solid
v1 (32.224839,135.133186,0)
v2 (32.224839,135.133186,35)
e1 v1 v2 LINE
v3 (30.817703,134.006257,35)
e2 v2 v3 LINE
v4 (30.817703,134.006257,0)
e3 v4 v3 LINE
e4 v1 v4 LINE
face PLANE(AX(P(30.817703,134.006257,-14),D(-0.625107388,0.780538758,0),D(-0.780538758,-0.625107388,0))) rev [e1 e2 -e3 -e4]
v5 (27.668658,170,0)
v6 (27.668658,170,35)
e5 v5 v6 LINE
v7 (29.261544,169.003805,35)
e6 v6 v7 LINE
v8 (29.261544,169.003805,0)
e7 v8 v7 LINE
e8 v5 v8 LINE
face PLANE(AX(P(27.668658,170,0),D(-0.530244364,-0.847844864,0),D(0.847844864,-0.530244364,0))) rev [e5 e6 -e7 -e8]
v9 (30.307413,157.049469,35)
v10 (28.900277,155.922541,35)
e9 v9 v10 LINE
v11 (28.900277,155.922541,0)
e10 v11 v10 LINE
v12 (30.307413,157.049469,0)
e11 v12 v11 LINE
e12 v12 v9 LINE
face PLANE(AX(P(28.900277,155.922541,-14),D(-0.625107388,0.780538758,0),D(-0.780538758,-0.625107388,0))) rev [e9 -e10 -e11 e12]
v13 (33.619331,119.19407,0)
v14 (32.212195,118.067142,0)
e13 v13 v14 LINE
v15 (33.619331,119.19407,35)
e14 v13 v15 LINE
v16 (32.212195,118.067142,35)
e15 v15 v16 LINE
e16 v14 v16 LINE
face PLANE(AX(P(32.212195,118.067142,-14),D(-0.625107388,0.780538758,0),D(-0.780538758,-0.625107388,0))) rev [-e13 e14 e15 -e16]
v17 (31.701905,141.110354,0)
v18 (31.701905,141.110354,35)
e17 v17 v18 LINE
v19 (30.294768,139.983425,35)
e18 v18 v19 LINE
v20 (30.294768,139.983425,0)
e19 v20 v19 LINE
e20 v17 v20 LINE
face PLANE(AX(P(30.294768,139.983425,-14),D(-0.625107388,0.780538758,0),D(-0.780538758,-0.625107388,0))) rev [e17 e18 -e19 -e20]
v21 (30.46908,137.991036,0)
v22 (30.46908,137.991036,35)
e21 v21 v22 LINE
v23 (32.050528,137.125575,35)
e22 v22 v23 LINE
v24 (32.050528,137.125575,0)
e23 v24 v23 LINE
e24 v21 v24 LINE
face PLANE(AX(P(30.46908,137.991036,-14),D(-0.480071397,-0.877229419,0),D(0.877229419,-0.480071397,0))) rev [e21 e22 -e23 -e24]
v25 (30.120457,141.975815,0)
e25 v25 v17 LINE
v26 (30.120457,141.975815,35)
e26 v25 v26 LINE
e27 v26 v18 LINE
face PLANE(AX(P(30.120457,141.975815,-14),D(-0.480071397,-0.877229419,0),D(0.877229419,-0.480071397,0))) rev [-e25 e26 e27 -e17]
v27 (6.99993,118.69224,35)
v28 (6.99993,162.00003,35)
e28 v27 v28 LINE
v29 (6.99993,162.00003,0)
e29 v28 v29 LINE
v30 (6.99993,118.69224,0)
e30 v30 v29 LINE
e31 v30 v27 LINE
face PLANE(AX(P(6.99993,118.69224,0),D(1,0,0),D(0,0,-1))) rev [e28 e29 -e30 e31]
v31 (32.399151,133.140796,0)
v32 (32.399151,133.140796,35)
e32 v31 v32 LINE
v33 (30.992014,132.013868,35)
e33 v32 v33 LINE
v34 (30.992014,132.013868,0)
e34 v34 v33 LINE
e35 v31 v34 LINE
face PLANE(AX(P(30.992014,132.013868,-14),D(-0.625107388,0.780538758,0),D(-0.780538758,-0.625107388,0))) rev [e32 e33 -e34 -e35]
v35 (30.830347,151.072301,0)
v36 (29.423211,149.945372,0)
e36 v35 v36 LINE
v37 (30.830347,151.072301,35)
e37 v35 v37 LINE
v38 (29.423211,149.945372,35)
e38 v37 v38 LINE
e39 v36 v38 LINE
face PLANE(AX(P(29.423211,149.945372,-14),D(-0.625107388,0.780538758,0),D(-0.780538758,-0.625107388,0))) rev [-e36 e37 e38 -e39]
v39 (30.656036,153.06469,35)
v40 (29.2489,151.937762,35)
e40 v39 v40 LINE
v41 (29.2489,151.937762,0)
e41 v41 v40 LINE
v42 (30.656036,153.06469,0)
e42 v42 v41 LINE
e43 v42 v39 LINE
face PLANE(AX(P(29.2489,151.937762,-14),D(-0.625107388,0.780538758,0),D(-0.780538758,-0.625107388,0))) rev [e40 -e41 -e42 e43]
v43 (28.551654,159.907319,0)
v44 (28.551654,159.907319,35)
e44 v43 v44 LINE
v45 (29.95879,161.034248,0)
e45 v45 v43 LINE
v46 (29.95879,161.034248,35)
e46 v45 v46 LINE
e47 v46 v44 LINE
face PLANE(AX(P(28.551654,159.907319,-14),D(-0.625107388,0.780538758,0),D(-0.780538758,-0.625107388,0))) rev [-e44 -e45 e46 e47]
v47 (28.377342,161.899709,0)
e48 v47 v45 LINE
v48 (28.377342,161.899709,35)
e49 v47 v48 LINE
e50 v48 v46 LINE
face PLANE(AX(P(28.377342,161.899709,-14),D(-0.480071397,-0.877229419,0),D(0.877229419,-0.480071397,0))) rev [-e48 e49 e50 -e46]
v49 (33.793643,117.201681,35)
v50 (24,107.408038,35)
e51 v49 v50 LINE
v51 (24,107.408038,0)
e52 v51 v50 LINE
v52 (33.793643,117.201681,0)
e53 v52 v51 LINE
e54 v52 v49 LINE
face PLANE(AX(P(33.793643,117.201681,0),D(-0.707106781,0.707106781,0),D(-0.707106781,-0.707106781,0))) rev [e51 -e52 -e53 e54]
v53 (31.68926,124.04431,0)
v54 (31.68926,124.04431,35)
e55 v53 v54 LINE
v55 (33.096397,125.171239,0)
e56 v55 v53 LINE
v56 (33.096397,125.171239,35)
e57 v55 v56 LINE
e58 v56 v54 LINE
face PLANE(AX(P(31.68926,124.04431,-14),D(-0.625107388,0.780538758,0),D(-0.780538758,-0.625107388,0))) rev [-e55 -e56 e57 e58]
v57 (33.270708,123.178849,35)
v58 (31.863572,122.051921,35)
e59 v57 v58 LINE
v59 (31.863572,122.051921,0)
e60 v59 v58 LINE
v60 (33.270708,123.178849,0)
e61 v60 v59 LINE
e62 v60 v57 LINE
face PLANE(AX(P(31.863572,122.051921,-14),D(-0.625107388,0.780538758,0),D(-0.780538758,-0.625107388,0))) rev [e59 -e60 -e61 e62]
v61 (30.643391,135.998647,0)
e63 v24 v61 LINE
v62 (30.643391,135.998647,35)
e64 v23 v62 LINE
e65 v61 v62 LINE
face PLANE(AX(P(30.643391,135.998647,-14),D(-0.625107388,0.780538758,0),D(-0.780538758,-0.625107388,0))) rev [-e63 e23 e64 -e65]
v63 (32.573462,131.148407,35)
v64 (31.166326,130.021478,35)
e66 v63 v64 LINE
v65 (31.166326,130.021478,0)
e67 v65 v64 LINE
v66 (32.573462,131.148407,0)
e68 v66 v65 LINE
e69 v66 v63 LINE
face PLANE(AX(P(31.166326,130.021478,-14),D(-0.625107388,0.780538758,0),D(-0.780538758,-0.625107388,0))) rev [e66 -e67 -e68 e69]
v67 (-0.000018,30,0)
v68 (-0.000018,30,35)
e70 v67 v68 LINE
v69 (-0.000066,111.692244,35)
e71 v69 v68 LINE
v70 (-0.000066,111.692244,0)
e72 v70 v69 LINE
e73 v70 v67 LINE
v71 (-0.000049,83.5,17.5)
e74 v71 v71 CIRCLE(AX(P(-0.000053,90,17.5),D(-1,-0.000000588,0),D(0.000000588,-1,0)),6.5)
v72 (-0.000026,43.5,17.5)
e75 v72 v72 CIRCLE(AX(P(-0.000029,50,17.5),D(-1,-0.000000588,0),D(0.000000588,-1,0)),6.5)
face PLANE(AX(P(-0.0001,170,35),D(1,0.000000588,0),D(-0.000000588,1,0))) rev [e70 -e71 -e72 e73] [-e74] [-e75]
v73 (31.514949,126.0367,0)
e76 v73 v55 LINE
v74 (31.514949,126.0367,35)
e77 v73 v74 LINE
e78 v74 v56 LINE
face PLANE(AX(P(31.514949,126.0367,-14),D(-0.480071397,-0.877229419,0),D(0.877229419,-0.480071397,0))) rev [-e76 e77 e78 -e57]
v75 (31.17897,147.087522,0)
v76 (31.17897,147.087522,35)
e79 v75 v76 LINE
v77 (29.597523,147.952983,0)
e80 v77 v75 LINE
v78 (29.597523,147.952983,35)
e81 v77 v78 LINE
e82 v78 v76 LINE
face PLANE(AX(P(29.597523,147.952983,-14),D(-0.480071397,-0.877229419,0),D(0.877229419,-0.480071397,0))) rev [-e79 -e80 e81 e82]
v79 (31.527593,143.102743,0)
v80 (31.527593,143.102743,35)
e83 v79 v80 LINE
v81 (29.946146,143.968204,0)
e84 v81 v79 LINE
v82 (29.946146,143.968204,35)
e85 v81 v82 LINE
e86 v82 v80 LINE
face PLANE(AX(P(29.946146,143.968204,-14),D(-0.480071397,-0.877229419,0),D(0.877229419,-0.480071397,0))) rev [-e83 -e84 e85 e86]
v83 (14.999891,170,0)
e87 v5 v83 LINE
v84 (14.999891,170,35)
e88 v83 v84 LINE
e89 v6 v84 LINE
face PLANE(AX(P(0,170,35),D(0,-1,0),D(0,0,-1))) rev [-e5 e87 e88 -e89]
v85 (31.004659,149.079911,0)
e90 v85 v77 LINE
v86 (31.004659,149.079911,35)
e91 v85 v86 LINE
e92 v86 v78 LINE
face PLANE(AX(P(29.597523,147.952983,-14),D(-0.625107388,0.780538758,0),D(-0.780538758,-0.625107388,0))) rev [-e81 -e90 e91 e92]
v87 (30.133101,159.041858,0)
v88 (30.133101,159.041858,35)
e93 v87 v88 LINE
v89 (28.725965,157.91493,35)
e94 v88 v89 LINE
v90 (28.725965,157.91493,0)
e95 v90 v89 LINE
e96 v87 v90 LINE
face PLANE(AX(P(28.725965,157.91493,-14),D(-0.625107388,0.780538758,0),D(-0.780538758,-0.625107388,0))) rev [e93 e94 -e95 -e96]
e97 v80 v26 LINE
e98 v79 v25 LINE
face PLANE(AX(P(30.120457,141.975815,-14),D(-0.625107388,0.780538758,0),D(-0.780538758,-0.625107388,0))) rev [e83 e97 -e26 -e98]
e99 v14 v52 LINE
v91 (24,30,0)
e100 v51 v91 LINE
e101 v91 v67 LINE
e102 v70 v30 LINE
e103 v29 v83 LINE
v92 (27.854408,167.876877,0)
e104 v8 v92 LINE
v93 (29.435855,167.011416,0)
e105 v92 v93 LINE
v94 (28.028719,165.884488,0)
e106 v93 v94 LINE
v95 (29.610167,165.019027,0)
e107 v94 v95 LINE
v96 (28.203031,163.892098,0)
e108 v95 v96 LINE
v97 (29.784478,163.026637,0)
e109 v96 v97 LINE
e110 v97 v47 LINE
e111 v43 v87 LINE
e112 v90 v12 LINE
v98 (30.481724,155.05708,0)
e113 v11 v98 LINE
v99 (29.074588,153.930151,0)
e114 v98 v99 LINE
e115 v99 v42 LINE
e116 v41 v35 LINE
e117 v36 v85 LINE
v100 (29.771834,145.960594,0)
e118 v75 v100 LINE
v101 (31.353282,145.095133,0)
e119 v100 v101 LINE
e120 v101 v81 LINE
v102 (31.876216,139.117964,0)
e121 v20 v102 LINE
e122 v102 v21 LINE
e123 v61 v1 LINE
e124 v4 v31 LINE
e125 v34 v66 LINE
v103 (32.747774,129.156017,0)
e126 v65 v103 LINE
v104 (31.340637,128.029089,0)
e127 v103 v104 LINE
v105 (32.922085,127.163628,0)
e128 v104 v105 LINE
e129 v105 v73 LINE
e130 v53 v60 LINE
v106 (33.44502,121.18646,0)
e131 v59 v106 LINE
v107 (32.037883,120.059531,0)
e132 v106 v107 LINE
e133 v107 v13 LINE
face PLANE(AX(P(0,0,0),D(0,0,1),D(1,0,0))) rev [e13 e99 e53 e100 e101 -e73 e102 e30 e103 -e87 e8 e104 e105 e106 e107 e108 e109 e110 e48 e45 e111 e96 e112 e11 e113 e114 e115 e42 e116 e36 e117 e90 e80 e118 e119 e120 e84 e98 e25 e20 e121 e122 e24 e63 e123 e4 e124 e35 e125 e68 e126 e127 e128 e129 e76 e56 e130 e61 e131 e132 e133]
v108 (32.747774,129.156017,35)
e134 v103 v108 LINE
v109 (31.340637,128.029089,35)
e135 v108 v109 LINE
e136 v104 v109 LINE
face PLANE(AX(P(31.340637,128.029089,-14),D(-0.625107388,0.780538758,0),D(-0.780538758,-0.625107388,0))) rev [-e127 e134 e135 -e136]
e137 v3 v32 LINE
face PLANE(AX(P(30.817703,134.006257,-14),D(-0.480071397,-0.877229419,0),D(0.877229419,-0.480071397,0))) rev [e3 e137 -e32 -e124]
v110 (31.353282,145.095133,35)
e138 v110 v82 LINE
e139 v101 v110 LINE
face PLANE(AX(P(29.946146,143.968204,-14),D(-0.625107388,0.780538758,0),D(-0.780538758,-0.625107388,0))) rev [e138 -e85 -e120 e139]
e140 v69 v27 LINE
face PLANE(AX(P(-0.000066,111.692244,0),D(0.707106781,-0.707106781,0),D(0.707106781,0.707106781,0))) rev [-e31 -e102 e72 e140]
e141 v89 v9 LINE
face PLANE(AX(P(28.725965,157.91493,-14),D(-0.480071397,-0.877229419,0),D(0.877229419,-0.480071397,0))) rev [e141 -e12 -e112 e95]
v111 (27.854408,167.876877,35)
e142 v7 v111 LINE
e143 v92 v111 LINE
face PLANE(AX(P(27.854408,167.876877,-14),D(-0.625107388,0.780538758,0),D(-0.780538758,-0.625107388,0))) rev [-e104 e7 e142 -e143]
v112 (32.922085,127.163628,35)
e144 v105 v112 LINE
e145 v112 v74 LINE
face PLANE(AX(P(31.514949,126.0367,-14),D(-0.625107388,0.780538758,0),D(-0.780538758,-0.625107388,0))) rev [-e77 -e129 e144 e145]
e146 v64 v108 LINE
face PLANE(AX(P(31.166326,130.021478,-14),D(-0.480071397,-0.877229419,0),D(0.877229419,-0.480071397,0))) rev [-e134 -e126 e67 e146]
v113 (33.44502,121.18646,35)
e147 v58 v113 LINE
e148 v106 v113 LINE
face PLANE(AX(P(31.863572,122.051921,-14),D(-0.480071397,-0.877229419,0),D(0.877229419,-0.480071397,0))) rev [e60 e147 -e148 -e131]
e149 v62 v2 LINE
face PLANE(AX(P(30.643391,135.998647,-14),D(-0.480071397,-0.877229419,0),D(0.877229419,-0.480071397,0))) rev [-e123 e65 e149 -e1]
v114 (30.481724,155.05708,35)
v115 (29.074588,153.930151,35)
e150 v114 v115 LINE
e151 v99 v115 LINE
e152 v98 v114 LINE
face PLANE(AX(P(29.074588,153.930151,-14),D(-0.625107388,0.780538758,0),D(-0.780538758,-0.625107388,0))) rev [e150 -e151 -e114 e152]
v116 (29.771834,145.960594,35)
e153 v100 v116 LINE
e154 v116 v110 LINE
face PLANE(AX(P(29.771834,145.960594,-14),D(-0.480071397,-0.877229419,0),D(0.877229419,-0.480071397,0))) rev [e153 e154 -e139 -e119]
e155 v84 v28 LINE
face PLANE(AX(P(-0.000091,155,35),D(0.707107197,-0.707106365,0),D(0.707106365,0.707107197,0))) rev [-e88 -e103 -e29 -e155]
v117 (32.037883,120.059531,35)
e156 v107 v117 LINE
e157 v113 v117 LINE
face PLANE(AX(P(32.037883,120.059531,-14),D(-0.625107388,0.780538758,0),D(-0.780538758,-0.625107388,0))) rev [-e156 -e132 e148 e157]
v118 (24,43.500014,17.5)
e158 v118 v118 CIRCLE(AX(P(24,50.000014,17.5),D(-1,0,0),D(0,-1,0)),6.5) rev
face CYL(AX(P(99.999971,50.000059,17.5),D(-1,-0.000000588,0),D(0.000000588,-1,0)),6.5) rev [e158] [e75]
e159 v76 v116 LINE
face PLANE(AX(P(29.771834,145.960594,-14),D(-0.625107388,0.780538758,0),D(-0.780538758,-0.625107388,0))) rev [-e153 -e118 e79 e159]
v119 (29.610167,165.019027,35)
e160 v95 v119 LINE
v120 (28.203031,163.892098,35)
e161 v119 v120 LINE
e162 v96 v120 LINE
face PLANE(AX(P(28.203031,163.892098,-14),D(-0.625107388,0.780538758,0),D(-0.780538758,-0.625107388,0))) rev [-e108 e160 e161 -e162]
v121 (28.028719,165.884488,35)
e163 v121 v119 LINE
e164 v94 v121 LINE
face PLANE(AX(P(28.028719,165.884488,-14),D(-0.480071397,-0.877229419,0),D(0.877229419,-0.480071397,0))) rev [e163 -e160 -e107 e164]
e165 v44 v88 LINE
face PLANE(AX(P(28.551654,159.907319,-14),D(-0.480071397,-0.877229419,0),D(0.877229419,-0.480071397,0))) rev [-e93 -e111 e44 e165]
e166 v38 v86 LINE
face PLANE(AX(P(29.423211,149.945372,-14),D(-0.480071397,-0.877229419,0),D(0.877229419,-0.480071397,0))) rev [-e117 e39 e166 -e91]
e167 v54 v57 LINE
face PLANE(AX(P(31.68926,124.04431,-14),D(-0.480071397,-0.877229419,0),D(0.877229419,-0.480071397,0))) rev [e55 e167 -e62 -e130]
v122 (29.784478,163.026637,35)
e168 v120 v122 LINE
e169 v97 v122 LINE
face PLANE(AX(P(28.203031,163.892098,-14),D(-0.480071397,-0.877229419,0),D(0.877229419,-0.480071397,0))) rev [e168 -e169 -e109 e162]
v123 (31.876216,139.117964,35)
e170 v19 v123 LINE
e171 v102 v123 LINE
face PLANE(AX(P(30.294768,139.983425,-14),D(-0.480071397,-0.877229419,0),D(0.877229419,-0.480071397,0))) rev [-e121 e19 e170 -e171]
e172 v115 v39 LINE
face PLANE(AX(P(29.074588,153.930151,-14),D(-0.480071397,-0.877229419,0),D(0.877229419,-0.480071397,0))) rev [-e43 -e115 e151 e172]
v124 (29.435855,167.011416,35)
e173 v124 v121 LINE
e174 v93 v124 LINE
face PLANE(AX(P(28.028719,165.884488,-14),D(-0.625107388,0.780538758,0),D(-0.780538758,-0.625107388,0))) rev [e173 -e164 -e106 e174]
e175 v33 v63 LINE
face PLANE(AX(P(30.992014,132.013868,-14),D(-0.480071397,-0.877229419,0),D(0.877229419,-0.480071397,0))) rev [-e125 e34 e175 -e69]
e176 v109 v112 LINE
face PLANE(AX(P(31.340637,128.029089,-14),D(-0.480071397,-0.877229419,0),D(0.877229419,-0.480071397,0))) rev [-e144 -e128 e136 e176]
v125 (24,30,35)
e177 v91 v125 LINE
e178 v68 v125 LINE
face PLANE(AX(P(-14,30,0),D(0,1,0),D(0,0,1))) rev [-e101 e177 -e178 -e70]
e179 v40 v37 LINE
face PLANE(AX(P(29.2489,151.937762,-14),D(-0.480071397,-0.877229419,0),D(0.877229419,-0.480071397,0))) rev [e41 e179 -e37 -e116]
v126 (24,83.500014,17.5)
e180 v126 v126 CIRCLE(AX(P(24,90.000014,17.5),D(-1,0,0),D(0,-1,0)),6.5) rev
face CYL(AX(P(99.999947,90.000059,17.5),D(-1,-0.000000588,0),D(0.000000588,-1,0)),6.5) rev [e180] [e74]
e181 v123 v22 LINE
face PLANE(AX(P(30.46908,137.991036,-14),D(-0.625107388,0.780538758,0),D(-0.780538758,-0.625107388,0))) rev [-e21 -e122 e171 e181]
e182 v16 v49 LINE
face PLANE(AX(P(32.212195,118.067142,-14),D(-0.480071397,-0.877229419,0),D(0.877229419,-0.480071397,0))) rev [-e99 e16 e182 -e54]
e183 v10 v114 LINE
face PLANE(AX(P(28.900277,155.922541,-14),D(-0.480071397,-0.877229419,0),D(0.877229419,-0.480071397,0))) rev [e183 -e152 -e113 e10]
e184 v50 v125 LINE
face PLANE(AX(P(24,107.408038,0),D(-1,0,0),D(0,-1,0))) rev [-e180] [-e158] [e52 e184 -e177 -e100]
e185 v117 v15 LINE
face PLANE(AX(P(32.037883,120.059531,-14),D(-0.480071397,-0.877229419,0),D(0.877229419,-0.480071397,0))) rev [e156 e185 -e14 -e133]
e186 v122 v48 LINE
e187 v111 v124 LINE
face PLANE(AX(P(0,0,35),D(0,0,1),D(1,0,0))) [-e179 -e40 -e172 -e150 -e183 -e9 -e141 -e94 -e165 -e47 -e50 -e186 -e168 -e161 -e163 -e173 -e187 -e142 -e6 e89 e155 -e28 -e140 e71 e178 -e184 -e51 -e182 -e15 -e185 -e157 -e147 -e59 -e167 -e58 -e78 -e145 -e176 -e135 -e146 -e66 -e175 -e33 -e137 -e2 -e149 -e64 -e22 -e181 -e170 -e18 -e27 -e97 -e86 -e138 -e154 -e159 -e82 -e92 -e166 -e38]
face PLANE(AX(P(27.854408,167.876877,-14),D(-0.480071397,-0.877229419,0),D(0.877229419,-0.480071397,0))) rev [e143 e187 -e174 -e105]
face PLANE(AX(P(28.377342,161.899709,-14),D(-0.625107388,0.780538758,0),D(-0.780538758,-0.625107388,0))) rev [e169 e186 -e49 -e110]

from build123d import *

# Parameters (mm, degrees)
EXTRUDE_1_DEPTH        = 35
CUT_EXTRUDE_28_DEPTH   = 49
CUT_EXTRUDE_29_DEPTH   = 178.259696491
CUT_EXTRUDE_30_DEPTH   = 49
PATTERN_LINEAR_1_COUNT = 26
PATTERN_LINEAR_1_PITCH = 2
CHAMFER_2_SIZE         = 3.4
SKETCH_54_W            = 35
SKETCH_54_H            = 30
CUT_EXTRUDE_33_DEPTH   = 50
CUT_EXTRUDE_34_DEPTH   = 110
CHAMFER_3_SIZE         = 15
SKETCH_61_R            = 6.5
CUT_EXTRUDE_37_DEPTH   = 100
CUT_EXTRUDE_38_DEPTH   = 177.82480109
CUT_EXTRUDE_39_DEPTH   = 177.82480109


with BuildPart() as part:
    # 草图48 → 拉伸1 (new body)
    with BuildSketch(Plane.XY):
        Polygon((34.1, 110), (36, 110), (36, 0), (0, 0), (-0.0001, 170), (34.1, 170), (34.1, 144.543002638), align=None)
    extrude(amount=EXTRUDE_1_DEPTH)

    # 草图49 → 切除-拉伸28 (cut)
    with BuildSketch(Plane.XY.offset(35)):
        Polygon((34.1, 113.69999995), (29.174388239, 170), (34.1, 170), align=None)
    extrude(amount=-CUT_EXTRUDE_28_DEPTH, mode=Mode.SUBTRACT)

    # 草图50 → 切除-拉伸29 (cut, through all)
    with BuildSketch(Plane.XY.offset(35)):
        Polygon((27.668658483, 170), (29.261543982, 169.003805302), (29.174388239, 170), align=None)
    extrude(amount=-CUT_EXTRUDE_29_DEPTH, mode=Mode.SUBTRACT)

    # 草图51 → 切除-拉伸30 (cut)
    with BuildSketch(Plane.XY.offset(35)):
        Polygon((27.854407685, 167.876876901), (29.261543982, 169.003805302), (29.435855467, 167.011415906), align=None)
    cut_extrude_30 = extrude(amount=-CUT_EXTRUDE_30_DEPTH, mode=Mode.SUBTRACT)

    # 阵列(线性)1: 切除-拉伸30 ×26
    with Locations(*[Vector(0.08715574274765898, -0.9961946980917455, 0) * (i * PATTERN_LINEAR_1_PITCH) for i in range(1, PATTERN_LINEAR_1_COUNT)]):
        add(cut_extrude_30, mode=Mode.SUBTRACT)

    # 倒角2
    # the kernel refuses this chamfer: 3.4 mm, written as the material it takes off along each edge
    with BuildSketch(Plane(origin=(36, 110, -8.743722159), x_dir=(-0.9996219169112966, 0.027495876610587885, 0), z_dir=(0, 0, 1))) as chamfer_2_piece_1_section:
        Polygon((CHAMFER_2_SIZE * 0.999621916911, CHAMFER_2_SIZE * 0.0274958766106), (-CHAMFER_2_SIZE * 0.0274958766106, CHAMFER_2_SIZE * 0.999621916911), (0, 0), align=None)
    chamfer_2_piece_1 = extrude(amount=52.487444318, mode=Mode.PRIVATE)
    chamfer_2_piece_1 = split(chamfer_2_piece_1, bisect_by=Plane(origin=(34.1, 108.700122697, 17.5), z_dir=(1, 0, 0)), keep=Keep.TOP, mode=Mode.PRIVATE)
    add(chamfer_2_piece_1, mode=Mode.SUBTRACT)

    # 草图54 → 切除-拉伸33 (cut)
    with BuildSketch(Plane(origin=(36, 0, 0), x_dir=(0, 0, -1), z_dir=(1, 0, 0))):
        with Locations((-17.5, 15)):
            Rectangle(SKETCH_54_W, SKETCH_54_H)
    extrude(amount=-CUT_EXTRUDE_33_DEPTH, mode=Mode.SUBTRACT)

    # 草图56 → 切除-拉伸34 (cut)
    with BuildSketch(Plane.XY.offset(35)):
        Polygon((29, 106.6), (33.793642605, 117.201681001), (59.324325826, 70.82967178), (36, 30), (29, 30), align=None)
    extrude(amount=-CUT_EXTRUDE_34_DEPTH, mode=Mode.SUBTRACT)

    # 倒角3
    chamfer_3_edges = [part.edges().sort_by_distance(p)[0] for p in [
        (-0.0001, 170, 17.5),
    ]]
    chamfer(chamfer_3_edges, length=CHAMFER_3_SIZE)

    # 草图61 → 切除-拉伸37 (cut)
    with BuildSketch(Plane(origin=(0, 0, 0), x_dir=(0, 0, 1), z_dir=(-0.9999999999998271, -5.882352941191543e-07, 0))):
        with Locations(Location((17.5, 50, 0), (0, 0, 270))):
            Circle(SKETCH_61_R)
        with Locations(Location((17.5, 90, 0), (0, 0, 270))):
            Circle(SKETCH_61_R)
    extrude(amount=-CUT_EXTRUDE_37_DEPTH, mode=Mode.SUBTRACT)

    # 草图62 → 切除-拉伸38 (cut, through all)
    with BuildSketch(Plane.XY.offset(35)):
        Polygon((33.793642605, 117.201681001), (24, 107.408038396), (24, 30), (29, 30), (29, 106.6), align=None)
    extrude(amount=-CUT_EXTRUDE_38_DEPTH, mode=Mode.SUBTRACT)

    # 草图63 → 切除-拉伸39 (cut, through all)
    with BuildSketch(Plane.XY.offset(35)):
        Polygon((-6.5701e-05, 111.692243943), (6.999930181, 118.692239825), (6.999930181, 179.62094854), (-6.5701e-05, 176.661572218), (-12.74320746, 177.391313792), (-12.74320746, 111.692243943), align=None)
    extrude(amount=-CUT_EXTRUDE_39_DEPTH, mode=Mode.SUBTRACT)


solid = part.part
